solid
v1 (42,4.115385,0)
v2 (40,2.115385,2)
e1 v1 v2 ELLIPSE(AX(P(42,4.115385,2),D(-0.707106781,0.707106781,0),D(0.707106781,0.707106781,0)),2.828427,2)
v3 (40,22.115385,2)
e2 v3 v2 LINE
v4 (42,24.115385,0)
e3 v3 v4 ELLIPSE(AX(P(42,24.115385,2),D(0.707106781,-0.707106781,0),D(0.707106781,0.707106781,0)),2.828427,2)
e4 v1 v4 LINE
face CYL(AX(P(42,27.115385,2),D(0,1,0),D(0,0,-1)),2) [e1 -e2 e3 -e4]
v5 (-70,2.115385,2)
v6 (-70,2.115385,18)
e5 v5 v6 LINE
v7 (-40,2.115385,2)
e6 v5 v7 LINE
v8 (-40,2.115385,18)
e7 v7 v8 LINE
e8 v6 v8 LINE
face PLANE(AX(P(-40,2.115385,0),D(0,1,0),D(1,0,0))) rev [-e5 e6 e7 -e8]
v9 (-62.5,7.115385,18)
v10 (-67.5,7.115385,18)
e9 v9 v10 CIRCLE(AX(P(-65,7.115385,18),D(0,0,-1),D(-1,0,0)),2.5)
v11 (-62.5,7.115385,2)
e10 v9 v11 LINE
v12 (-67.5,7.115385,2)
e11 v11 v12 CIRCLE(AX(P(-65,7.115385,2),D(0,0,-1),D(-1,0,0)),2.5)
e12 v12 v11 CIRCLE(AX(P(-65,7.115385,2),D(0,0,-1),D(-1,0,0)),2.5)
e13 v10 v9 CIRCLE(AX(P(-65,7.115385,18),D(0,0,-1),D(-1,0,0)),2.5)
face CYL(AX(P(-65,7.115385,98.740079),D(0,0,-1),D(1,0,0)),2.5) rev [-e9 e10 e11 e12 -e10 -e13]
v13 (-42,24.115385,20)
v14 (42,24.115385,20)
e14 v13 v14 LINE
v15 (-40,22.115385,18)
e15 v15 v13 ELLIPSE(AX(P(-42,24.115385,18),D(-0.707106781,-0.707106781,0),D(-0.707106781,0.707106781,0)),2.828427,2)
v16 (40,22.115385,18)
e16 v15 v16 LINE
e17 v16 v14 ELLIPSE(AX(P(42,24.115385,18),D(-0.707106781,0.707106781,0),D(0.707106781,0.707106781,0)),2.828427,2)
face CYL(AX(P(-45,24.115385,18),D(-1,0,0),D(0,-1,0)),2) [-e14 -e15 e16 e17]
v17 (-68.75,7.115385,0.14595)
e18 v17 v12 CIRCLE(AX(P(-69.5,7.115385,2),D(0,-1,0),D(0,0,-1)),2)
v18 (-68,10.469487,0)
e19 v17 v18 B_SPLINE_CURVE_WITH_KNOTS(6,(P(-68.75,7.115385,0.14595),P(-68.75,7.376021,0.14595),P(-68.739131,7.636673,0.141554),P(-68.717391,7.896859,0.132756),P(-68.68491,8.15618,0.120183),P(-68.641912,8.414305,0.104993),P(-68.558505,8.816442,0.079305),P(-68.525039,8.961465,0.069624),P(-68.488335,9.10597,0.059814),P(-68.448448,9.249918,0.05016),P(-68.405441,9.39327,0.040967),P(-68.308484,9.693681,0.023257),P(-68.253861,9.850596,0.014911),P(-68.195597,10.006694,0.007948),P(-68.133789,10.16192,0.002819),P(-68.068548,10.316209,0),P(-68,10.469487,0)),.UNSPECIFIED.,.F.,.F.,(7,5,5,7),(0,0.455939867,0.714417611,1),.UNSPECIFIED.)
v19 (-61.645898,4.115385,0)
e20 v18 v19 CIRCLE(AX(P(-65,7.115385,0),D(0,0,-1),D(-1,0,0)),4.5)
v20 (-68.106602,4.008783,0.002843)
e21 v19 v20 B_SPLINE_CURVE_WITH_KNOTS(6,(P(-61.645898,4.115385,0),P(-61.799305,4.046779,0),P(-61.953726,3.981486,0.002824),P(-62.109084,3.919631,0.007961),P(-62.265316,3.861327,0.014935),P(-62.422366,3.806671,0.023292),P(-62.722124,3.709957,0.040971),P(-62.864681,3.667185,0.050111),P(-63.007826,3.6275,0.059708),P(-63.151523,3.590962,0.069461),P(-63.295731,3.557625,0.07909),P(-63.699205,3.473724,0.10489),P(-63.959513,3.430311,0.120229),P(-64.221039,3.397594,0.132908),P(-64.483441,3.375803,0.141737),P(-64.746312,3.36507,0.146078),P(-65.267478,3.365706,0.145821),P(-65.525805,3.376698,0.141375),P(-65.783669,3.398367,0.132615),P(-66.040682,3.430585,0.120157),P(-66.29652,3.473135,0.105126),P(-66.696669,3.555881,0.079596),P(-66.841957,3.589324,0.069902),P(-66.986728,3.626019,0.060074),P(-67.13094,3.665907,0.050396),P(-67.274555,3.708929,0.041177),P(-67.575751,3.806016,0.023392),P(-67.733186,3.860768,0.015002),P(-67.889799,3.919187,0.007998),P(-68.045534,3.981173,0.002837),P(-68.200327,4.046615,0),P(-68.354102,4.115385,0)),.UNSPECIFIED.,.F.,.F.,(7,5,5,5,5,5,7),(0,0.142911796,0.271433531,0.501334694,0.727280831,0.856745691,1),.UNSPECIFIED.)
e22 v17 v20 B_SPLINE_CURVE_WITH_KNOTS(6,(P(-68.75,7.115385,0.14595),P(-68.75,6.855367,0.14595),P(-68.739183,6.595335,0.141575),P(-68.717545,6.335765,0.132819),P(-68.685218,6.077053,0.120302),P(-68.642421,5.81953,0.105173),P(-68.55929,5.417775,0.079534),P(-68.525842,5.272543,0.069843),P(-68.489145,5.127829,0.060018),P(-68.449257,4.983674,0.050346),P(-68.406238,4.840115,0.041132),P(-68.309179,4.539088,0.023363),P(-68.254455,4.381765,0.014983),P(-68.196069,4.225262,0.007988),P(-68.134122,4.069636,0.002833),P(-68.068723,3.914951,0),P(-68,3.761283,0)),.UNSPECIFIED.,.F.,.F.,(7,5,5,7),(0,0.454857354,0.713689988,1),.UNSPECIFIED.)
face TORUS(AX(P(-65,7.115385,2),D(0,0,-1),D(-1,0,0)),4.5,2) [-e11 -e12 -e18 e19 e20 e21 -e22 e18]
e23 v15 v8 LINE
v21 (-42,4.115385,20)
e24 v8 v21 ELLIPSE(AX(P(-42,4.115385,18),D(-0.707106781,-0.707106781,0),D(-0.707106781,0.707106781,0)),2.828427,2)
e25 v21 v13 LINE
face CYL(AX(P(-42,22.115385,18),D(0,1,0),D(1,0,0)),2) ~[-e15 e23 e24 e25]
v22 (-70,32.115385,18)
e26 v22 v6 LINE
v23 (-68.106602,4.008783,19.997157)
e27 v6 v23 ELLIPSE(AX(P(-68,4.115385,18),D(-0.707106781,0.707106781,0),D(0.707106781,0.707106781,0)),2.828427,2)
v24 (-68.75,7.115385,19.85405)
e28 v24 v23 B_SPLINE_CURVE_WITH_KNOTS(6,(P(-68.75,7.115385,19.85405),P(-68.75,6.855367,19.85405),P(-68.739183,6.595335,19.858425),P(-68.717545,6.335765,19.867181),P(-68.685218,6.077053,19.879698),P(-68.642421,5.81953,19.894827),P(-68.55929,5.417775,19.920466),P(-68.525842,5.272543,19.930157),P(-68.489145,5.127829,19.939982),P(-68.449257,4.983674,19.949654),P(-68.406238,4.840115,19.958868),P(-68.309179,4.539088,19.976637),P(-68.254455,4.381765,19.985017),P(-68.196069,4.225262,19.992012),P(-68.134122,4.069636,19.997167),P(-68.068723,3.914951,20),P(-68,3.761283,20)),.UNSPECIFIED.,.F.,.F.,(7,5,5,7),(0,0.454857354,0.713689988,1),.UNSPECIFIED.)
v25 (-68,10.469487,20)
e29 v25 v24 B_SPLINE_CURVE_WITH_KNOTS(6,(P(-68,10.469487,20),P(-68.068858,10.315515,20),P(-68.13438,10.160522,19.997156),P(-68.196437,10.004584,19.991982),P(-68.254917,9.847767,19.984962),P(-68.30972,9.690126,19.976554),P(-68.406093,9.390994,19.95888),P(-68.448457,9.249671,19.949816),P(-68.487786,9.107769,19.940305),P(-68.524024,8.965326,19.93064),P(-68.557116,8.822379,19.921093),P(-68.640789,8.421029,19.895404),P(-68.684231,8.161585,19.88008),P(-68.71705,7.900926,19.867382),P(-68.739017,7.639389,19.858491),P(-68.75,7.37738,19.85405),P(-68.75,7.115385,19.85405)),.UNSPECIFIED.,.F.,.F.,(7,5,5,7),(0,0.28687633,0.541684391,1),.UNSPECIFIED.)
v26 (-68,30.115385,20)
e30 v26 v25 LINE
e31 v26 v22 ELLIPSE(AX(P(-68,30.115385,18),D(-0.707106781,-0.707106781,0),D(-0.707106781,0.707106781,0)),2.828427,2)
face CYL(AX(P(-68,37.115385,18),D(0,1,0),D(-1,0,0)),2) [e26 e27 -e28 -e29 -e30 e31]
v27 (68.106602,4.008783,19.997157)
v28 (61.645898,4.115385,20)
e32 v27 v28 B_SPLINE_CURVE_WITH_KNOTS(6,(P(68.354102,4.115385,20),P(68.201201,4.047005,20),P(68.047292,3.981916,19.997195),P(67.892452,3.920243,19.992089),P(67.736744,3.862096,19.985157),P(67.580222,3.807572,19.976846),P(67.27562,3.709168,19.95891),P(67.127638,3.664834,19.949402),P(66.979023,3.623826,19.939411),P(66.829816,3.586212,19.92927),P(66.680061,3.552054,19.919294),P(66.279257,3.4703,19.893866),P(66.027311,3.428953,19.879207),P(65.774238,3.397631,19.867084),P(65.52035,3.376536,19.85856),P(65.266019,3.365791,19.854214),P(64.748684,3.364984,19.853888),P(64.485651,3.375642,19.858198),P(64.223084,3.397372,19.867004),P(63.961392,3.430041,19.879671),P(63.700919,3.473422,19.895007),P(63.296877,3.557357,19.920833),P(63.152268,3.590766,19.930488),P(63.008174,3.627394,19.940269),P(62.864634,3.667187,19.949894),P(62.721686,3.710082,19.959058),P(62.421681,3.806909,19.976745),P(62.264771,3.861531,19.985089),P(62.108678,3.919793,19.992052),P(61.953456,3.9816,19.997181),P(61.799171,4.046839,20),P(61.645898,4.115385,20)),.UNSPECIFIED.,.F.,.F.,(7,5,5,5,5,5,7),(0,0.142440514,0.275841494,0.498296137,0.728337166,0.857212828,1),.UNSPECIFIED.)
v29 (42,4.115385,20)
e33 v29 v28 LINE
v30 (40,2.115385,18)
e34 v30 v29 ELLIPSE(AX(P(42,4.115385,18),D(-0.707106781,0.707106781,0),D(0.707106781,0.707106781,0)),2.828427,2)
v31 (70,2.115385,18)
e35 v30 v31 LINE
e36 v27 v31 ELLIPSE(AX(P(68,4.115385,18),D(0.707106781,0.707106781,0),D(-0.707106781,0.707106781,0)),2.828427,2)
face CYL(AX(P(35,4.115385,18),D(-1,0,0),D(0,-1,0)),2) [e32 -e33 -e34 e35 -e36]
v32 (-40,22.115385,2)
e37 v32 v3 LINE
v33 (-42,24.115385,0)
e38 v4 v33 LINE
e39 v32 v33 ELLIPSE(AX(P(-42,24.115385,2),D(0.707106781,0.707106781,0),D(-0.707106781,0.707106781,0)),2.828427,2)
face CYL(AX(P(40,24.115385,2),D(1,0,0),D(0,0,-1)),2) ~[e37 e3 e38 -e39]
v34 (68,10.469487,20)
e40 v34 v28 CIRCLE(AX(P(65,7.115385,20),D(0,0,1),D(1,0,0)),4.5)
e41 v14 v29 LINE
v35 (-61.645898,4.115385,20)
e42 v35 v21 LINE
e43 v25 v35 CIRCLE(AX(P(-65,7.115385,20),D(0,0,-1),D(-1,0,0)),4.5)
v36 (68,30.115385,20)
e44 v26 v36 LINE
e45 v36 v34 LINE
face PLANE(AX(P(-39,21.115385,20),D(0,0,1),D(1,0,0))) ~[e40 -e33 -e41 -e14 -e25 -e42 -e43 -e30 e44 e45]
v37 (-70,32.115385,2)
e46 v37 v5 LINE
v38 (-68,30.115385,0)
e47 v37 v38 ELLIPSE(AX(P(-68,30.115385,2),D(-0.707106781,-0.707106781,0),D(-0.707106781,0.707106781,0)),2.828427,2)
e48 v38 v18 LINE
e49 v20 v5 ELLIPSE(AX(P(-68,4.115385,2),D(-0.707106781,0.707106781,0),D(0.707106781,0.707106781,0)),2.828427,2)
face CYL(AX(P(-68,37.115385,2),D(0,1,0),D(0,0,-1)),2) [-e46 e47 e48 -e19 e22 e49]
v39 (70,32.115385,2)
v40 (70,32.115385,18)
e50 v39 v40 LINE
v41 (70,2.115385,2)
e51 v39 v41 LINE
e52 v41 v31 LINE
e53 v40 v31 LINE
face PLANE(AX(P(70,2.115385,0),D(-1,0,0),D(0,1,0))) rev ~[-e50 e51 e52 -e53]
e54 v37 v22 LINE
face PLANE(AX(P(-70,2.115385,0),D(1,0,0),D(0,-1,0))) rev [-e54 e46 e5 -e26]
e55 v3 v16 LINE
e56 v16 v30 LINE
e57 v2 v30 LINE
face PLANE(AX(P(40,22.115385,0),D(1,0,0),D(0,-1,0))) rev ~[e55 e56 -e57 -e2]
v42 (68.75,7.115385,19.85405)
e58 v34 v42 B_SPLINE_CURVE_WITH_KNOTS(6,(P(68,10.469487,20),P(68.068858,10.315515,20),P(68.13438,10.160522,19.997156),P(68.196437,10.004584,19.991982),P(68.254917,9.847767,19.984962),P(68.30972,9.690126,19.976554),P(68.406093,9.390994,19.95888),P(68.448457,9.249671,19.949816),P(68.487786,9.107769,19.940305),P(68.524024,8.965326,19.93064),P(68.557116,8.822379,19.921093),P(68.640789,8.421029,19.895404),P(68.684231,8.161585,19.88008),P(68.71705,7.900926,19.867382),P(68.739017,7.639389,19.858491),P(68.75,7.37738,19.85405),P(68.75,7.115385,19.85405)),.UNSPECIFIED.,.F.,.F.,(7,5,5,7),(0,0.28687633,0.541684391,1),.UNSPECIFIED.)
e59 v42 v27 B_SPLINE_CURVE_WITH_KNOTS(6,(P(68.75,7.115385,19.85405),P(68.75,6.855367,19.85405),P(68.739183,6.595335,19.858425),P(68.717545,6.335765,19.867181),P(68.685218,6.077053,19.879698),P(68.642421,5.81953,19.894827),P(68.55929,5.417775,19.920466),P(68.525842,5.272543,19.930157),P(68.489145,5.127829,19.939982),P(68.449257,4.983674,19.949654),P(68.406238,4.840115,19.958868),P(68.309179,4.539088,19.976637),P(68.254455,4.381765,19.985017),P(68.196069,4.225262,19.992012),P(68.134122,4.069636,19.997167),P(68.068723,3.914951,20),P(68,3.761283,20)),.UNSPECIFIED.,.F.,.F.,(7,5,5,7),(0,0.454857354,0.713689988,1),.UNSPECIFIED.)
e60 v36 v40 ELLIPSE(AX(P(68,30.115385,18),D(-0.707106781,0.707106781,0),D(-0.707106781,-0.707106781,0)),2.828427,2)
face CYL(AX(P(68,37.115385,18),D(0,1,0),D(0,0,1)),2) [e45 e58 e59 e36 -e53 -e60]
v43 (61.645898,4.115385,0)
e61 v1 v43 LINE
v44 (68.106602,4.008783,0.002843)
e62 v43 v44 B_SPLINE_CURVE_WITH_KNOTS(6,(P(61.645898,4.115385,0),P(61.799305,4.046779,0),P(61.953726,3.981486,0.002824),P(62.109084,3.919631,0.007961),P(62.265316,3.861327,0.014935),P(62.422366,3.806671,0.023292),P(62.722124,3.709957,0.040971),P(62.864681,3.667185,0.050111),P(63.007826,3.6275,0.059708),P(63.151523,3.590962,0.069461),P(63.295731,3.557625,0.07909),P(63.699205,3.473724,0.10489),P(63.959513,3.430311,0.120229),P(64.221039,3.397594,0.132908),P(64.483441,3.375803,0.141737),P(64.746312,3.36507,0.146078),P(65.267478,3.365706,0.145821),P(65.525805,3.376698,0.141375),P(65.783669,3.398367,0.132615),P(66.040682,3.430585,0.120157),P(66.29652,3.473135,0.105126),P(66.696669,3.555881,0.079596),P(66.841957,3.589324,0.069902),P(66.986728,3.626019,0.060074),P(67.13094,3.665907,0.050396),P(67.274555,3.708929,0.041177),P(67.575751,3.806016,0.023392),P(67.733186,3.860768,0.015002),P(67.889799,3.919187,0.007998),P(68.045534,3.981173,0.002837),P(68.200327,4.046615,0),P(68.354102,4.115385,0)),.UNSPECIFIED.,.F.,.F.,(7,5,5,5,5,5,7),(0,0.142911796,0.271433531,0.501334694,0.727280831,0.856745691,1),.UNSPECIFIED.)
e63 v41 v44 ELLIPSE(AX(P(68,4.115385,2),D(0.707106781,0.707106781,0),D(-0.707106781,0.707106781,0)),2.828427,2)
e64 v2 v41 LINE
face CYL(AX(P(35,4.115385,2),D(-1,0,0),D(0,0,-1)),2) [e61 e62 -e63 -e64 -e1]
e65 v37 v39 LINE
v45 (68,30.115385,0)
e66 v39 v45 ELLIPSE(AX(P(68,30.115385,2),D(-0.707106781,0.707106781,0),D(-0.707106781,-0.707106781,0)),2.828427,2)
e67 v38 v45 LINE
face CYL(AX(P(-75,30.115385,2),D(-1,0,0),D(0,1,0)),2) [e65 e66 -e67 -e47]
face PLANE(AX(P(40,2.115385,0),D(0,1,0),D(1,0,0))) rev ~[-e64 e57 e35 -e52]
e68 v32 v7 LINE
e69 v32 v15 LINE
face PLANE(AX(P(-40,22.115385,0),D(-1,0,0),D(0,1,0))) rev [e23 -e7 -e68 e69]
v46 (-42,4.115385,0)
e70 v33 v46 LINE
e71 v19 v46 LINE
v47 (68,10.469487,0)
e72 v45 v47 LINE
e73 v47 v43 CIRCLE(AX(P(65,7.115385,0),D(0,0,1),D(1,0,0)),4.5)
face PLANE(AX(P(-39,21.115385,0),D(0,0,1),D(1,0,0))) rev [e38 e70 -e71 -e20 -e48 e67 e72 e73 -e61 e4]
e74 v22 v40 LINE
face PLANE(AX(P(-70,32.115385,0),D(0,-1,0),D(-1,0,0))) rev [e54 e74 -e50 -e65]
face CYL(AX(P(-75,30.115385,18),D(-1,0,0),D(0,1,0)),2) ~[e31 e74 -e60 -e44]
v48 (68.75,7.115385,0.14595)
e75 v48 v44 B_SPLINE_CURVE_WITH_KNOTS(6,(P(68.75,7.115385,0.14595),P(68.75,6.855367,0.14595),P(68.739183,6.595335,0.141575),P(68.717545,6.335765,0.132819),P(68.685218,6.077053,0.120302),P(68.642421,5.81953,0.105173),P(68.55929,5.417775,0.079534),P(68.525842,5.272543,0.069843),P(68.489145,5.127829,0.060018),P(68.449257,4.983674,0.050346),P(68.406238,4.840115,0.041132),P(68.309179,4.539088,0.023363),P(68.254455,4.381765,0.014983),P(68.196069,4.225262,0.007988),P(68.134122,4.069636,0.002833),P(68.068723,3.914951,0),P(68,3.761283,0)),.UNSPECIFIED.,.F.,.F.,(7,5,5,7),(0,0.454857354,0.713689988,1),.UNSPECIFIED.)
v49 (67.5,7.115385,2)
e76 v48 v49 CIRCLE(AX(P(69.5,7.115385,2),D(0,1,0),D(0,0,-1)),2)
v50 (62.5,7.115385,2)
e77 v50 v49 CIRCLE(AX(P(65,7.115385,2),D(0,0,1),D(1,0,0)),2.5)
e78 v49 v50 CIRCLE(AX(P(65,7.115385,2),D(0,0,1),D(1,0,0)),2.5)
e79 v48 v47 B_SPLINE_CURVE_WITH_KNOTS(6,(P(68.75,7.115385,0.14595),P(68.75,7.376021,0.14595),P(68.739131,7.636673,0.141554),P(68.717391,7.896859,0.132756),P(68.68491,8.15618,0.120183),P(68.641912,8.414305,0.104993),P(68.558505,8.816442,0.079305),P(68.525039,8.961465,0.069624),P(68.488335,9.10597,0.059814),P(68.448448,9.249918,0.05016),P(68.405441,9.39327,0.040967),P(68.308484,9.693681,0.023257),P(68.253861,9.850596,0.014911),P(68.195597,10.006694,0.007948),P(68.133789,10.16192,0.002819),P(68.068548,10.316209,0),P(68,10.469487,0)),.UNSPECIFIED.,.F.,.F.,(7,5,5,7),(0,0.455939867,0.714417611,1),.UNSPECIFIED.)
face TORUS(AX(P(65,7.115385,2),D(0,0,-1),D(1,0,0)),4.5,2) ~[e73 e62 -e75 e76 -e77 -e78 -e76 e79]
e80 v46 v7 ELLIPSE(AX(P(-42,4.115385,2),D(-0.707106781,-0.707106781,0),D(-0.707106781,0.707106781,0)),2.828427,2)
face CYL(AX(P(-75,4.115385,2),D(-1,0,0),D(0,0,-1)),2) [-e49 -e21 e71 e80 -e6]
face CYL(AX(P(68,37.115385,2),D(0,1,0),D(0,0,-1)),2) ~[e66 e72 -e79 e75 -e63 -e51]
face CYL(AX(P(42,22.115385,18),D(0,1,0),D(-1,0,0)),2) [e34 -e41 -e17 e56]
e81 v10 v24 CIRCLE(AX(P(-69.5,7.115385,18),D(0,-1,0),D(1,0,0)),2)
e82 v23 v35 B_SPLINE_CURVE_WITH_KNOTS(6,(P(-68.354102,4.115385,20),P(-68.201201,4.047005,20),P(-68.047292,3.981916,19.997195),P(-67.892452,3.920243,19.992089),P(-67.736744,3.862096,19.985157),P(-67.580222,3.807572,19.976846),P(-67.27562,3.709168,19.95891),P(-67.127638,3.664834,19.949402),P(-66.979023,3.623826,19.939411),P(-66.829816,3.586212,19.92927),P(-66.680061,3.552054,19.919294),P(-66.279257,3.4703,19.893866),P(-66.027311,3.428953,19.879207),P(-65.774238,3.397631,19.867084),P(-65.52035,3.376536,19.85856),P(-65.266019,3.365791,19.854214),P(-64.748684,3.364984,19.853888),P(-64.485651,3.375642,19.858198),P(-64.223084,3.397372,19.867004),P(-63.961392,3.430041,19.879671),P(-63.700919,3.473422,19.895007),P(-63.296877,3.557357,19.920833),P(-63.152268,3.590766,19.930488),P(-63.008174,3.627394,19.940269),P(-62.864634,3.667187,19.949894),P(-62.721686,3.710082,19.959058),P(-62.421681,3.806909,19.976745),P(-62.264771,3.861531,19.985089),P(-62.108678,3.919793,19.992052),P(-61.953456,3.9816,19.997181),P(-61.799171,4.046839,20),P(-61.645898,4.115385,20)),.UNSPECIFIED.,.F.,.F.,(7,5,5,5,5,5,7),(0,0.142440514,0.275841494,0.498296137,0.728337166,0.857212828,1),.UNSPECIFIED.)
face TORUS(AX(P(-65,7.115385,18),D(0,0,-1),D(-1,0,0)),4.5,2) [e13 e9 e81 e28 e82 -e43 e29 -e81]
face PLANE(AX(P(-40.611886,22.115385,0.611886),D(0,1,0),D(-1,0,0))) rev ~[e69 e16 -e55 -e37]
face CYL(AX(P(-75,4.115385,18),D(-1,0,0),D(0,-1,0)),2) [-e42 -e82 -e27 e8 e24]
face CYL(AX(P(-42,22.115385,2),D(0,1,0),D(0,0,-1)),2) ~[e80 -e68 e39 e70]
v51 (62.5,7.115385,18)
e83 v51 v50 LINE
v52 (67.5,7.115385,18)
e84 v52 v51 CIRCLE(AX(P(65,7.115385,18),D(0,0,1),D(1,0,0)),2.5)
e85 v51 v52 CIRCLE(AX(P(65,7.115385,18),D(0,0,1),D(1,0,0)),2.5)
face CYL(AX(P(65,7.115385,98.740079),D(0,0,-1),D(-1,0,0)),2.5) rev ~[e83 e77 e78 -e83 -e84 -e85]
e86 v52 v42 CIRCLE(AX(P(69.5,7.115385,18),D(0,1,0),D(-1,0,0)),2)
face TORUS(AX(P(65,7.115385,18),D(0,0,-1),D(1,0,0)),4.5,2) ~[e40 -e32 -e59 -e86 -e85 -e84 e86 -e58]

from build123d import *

# Parameters (mm, degrees)
F1_DEPTH     = 20
F3_D         = 5
F5_T1_DEPTH  = 150
F5_T3_DEPTH  = 40
F5_T5_DEPTH  = 40
F5_T7_DEPTH  = 25
F5_T9_DEPTH  = 80
F5_T11_DEPTH = 40
F5_T25_DEPTH = 85
F5_T29_DEPTH = 30
F5_T36_DEPTH = 30
F5_T40_DEPTH = 85
F5_T47_DEPTH = 30
F5_T51_DEPTH = 85
F5_T58_DEPTH = 85
F5_T62_DEPTH = 30


# Not quite as in the source:
# - a fillet or chamfer that OpenCascade refuses, or shapes differently, is made with other operations: its cross-section is extruded or revolved along the edge and cut away or added


with BuildPart() as f1:
    # F0 (on Top) → F1 (new body)
    with BuildSketch(Plane.XY):
        Polygon((70, 32.1153850414), (0, 32.1153850414), (0, 22.1153850414), (40, 22.1153850414), (40, 2.1153850414), (70, 2.1153850414), align=None)
    extrude(amount=F1_DEPTH)

    # F3 (through all)
    with Locations(Plane.XY.offset(20)):
        with Locations((65, 7.1153850414)):
            Hole(F3_D / 2)

    # F4: F1 across face


with BuildPart() as f1_1:
    add(f1.part)
    add(f1.part.mirror(Plane(origin=(0, 27.1153850414, 10), x_dir=(0, -1, 0), z_dir=(-1, 0, 0))))

    # F5: fillet of radius 2 on 20 edges, made by hand

    # F5_s2 → F5_t1 (cut)
    with BuildSketch(Plane.YZ.offset(-75)):
        with BuildLine():
            ThreePointArc((32.1153850414, 18), (31.5295986038, 19.4142135624), (30.1153850414, 20))
            Line((30.1153850414, 20), (32.1153850414, 20))
            Line((32.1153850414, 20), (32.1153850414, 18))
        make_face()
        with BuildLine():
            ThreePointArc((32.1153850414, 2), (31.5295986038, 0.5857864376), (30.1153850414, 0))
            Line((30.1153850414, 0), (32.1153850414, 0))
            Line((32.1153850414, 0), (32.1153850414, 2))
        make_face()
    extrude(amount=F5_T1_DEPTH, mode=Mode.SUBTRACT)

    # F5_s4 → F5_t3 (cut)
    with BuildSketch(Plane.XZ.offset(-37.1153850414)):
        with BuildLine():
            ThreePointArc((-70, 18), (-69.4142135624, 19.4142135624), (-68, 20))
            Line((-68, 20), (-70, 20))
            Line((-70, 20), (-70, 18))
        make_face()
        with BuildLine():
            ThreePointArc((68, 20), (69.4142135624, 19.4142135624), (70, 18))
            Line((70, 18), (70, 20))
            Line((70, 20), (68, 20))
        make_face()
        with BuildLine():
            ThreePointArc((-68, 0), (-69.4142135624, 0.5857864376), (-70, 2))
            Line((-70, 2), (-70, 0))
            Line((-70, 0), (-68, 0))
        make_face()
        with BuildLine():
            ThreePointArc((68, 0), (69.4142135624, 0.5857864376), (70, 2))
            Line((70, 2), (70, 0))
            Line((70, 0), (68, 0))
        make_face()
    extrude(amount=F5_T3_DEPTH, mode=Mode.SUBTRACT)

    # F5_s6 → F5_t5 (cut)
    with BuildSketch(Plane.YZ.offset(-75)):
        with BuildLine():
            ThreePointArc((2.1153850414, 18), (2.701171479, 19.4142135624), (4.1153850414, 20))
            Line((4.1153850414, 20), (2.1153850414, 20))
            Line((2.1153850414, 20), (2.1153850414, 18))
        make_face()
        with BuildLine():
            ThreePointArc((4.1153850414, 0), (2.701171479, 0.5857864376), (2.1153850414, 2))
            Line((2.1153850414, 2), (2.1153850414, 0))
            Line((2.1153850414, 0), (4.1153850414, 0))
        make_face()
    extrude(amount=F5_T5_DEPTH, mode=Mode.SUBTRACT)

    # F5_s8 → F5_t7 (cut)
    with BuildSketch(Plane.XZ.offset(-22.1153850414)):
        with BuildLine():
            ThreePointArc((-40, 18), (-40.5857864376, 19.4142135624), (-42, 20))
            Line((-42, 20), (-40, 20))
            Line((-40, 20), (-40, 18))
        make_face()
        with BuildLine():
            ThreePointArc((40, 18), (40.5857864376, 19.4142135624), (42, 20))
            Line((42, 20), (40, 20))
            Line((40, 20), (40, 18))
        make_face()
        with BuildLine():
            ThreePointArc((-42, 0), (-40.5857864376, 0.5857864376), (-40, 2))
            Line((-40, 2), (-40, 0))
            Line((-40, 0), (-42, 0))
        make_face()
        with BuildLine():
            ThreePointArc((42, 0), (40.5857864376, 0.5857864376), (40, 2))
            Line((40, 2), (40, 0))
            Line((40, 0), (42, 0))
        make_face()
    extrude(amount=F5_T7_DEPTH, mode=Mode.SUBTRACT)

    # F5_s10 → F5_t9 (cut)
    with BuildSketch(Plane.YZ.offset(-40)):
        with BuildLine():
            ThreePointArc((22.1153850414, 18), (22.701171479, 19.4142135624), (24.1153850414, 20))
            Line((24.1153850414, 20), (22.1153850414, 20))
            Line((22.1153850414, 20), (22.1153850414, 18))
        make_face()
        with BuildLine():
            ThreePointArc((24.1153850414, 0), (22.701171479, 0.5857864376), (22.1153850414, 2))
            Line((22.1153850414, 2), (22.1153850414, 0))
            Line((22.1153850414, 0), (24.1153850414, 0))
        make_face()
    extrude(amount=F5_T9_DEPTH, mode=Mode.SUBTRACT)

    # F5_s12 → F5_t11 (cut)
    with BuildSketch(Plane.YZ.offset(35)):
        with BuildLine():
            ThreePointArc((2.1153850414, 18), (2.701171479, 19.4142135624), (4.1153850414, 20))
            Line((4.1153850414, 20), (2.1153850414, 20))
            Line((2.1153850414, 20), (2.1153850414, 18))
        make_face()
        with BuildLine():
            ThreePointArc((4.1153850414, 0), (2.701171479, 0.5857864376), (2.1153850414, 2))
            Line((2.1153850414, 2), (2.1153850414, 0))
            Line((2.1153850414, 0), (4.1153850414, 0))
        make_face()
    extrude(amount=F5_T11_DEPTH, mode=Mode.SUBTRACT)

    # F5_s13 → F5_t14 (revolve, cut)
    with BuildSketch(Plane.XZ.offset(-7.1153850414)):
        with BuildLine():
            ThreePointArc((67.5, 18), (68.0857864376, 19.4142135624), (69.5, 20))
            Line((69.5, 20), (67.5, 20))
            Line((67.5, 20), (67.5, 18))
        make_face()
    revolve(axis=Axis((65, 7.1153850414, 20), (0, 0, 1)), mode=Mode.SUBTRACT)

    # F5_s15 → F5_t16 (revolve, cut)
    with BuildSketch(Plane.XZ.offset(-7.1153850414)):
        with BuildLine():
            ThreePointArc((-67.5, 18), (-68.0857864376, 19.4142135624), (-69.5, 20))
            Line((-69.5, 20), (-67.5, 20))
            Line((-67.5, 20), (-67.5, 18))
        make_face()
    revolve(axis=Axis((-65, 7.1153850414, 20), (0, 0, -1)), mode=Mode.SUBTRACT)

    # F5_s17 → F5_t18 (revolve, cut)
    with BuildSketch(Plane.XZ.offset(-7.1153850414)):
        with BuildLine():
            ThreePointArc((69.5, 0), (68.0857864376, 0.5857864376), (67.5, 2))
            Line((67.5, 2), (67.5, 0))
            Line((67.5, 0), (69.5, 0))
        make_face()
    revolve(axis=Axis((65, 7.1153850414, 0), (0, 0, 1)), mode=Mode.SUBTRACT)

    # F5_s19 → F5_t20 (revolve, cut)
    with BuildSketch(Plane.XZ.offset(-7.1153850414)):
        with BuildLine():
            ThreePointArc((-69.5, 0), (-68.0857864376, 0.5857864376), (-67.5, 2))
            Line((-67.5, 2), (-67.5, 0))
            Line((-67.5, 0), (-69.5, 0))
        make_face()
    revolve(axis=Axis((-65, 7.1153850414, 0), (0, 0, -1)), mode=Mode.SUBTRACT)


with BuildPart() as f5_tool23:
    # F5_s24 → F5_t25 (new body)
    with BuildSketch(Plane.YZ.offset(-45)):
        with BuildLine():
            ThreePointArc((22.1153850414, 18), (22.701171479, 19.4142135624), (24.1153850414, 20))
            Line((24.1153850414, 20), (22.1153850414, 20))
            Line((22.1153850414, 20), (22.1153850414, 18))
        make_face()
    extrude(amount=F5_T25_DEPTH)

    split(bisect_by=Plane.YZ.offset(-40), keep=Keep.BOTTOM)


with BuildPart() as f5_tool27:
    # F5_s28 → F5_t29 (new body)
    with BuildSketch(Plane.XZ.offset(-27.1153850414)):
        with BuildLine():
            ThreePointArc((-40, 18), (-40.5857864376, 19.4142135624), (-42, 20))
            Line((-42, 20), (-40, 20))
            Line((-40, 20), (-40, 18))
        make_face()
    extrude(amount=F5_T29_DEPTH)

    split(bisect_by=Plane.XZ.offset(-22.1153850414), keep=Keep.BOTTOM)


with BuildPart() as f5_tool23_1:
    add(f5_tool23.part)

    # F5_t31: intersect F5_tool27
    add(f5_tool27.part, mode=Mode.INTERSECT)


with BuildPart() as f1_2:
    add(f1_1.part)

    # F5_t21: cut F5_tool23
    add(f5_tool23_1.part, mode=Mode.SUBTRACT)


with BuildPart() as f5_tool34:
    # F5_s35 → F5_t36 (new body)
    with BuildSketch(Plane.XZ.offset(-27.1153850414)):
        with BuildLine():
            ThreePointArc((40, 18), (40.5857864376, 19.4142135624), (42, 20))
            Line((42, 20), (40, 20))
            Line((40, 20), (40, 18))
        make_face()
    extrude(amount=F5_T36_DEPTH)

    split(bisect_by=Plane.XZ.offset(-22.1153850414), keep=Keep.BOTTOM)


with BuildPart() as f5_tool38:
    # F5_s39 → F5_t40 (new body)
    with BuildSketch(Plane.YZ.offset(-40)):
        with BuildLine():
            ThreePointArc((22.1153850414, 18), (22.701171479, 19.4142135624), (24.1153850414, 20))
            Line((24.1153850414, 20), (22.1153850414, 20))
            Line((22.1153850414, 20), (22.1153850414, 18))
        make_face()
    extrude(amount=F5_T40_DEPTH)

    split(bisect_by=Plane.YZ.offset(40), keep=Keep.TOP)


with BuildPart() as f5_tool34_1:
    add(f5_tool34.part)

    # F5_t42: intersect F5_tool38
    add(f5_tool38.part, mode=Mode.INTERSECT)


with BuildPart() as f1_3:
    add(f1_2.part)

    # F5_t32: cut F5_tool34
    add(f5_tool34_1.part, mode=Mode.SUBTRACT)


with BuildPart() as f5_tool45:
    # F5_s46 → F5_t47 (new body)
    with BuildSketch(Plane.XZ.offset(-27.1153850414)):
        with BuildLine():
            ThreePointArc((-42, 0), (-40.5857864376, 0.5857864376), (-40, 2))
            Line((-40, 2), (-40, 0))
            Line((-40, 0), (-42, 0))
        make_face()
    extrude(amount=F5_T47_DEPTH)

    split(bisect_by=Plane.XZ.offset(-22.1153850414), keep=Keep.BOTTOM)


with BuildPart() as f5_tool49:
    # F5_s50 → F5_t51 (new body)
    with BuildSketch(Plane.YZ.offset(40)):
        with BuildLine():
            ThreePointArc((24.1153850414, 0), (22.701171479, 0.5857864376), (22.1153850414, 2))
            Line((22.1153850414, 2), (22.1153850414, 0))
            Line((22.1153850414, 0), (24.1153850414, 0))
        make_face()
    extrude(amount=-F5_T51_DEPTH)

    split(bisect_by=Plane.YZ.offset(-40), keep=Keep.BOTTOM)


with BuildPart() as f5_tool45_1:
    add(f5_tool45.part)

    # F5_t53: intersect F5_tool49
    add(f5_tool49.part, mode=Mode.INTERSECT)


with BuildPart() as f1_4:
    add(f1_3.part)

    # F5_t43: cut F5_tool45
    add(f5_tool45_1.part, mode=Mode.SUBTRACT)


with BuildPart() as f5_tool56:
    # F5_s57 → F5_t58 (new body)
    with BuildSketch(Plane.YZ.offset(45)):
        with BuildLine():
            ThreePointArc((24.1153850414, 0), (22.701171479, 0.5857864376), (22.1153850414, 2))
            Line((22.1153850414, 2), (22.1153850414, 0))
            Line((22.1153850414, 0), (24.1153850414, 0))
        make_face()
    extrude(amount=-F5_T58_DEPTH)

    split(bisect_by=Plane.YZ.offset(40), keep=Keep.TOP)


with BuildPart() as f5_tool60:
    # F5_s61 → F5_t62 (new body)
    with BuildSketch(Plane.XZ.offset(-27.1153850414)):
        with BuildLine():
            ThreePointArc((42, 0), (40.5857864376, 0.5857864376), (40, 2))
            Line((40, 2), (40, 0))
            Line((40, 0), (42, 0))
        make_face()
    extrude(amount=F5_T62_DEPTH)

    split(bisect_by=Plane.XZ.offset(-22.1153850414), keep=Keep.BOTTOM)


with BuildPart() as f5_tool56_1:
    add(f5_tool56.part)

    # F5_t64: intersect F5_tool60
    add(f5_tool60.part, mode=Mode.INTERSECT)


with BuildPart() as f1_5:
    add(f1_4.part)

    # F5_t54: cut F5_tool56
    add(f5_tool56_1.part, mode=Mode.SUBTRACT)


solid = f1_5.part
